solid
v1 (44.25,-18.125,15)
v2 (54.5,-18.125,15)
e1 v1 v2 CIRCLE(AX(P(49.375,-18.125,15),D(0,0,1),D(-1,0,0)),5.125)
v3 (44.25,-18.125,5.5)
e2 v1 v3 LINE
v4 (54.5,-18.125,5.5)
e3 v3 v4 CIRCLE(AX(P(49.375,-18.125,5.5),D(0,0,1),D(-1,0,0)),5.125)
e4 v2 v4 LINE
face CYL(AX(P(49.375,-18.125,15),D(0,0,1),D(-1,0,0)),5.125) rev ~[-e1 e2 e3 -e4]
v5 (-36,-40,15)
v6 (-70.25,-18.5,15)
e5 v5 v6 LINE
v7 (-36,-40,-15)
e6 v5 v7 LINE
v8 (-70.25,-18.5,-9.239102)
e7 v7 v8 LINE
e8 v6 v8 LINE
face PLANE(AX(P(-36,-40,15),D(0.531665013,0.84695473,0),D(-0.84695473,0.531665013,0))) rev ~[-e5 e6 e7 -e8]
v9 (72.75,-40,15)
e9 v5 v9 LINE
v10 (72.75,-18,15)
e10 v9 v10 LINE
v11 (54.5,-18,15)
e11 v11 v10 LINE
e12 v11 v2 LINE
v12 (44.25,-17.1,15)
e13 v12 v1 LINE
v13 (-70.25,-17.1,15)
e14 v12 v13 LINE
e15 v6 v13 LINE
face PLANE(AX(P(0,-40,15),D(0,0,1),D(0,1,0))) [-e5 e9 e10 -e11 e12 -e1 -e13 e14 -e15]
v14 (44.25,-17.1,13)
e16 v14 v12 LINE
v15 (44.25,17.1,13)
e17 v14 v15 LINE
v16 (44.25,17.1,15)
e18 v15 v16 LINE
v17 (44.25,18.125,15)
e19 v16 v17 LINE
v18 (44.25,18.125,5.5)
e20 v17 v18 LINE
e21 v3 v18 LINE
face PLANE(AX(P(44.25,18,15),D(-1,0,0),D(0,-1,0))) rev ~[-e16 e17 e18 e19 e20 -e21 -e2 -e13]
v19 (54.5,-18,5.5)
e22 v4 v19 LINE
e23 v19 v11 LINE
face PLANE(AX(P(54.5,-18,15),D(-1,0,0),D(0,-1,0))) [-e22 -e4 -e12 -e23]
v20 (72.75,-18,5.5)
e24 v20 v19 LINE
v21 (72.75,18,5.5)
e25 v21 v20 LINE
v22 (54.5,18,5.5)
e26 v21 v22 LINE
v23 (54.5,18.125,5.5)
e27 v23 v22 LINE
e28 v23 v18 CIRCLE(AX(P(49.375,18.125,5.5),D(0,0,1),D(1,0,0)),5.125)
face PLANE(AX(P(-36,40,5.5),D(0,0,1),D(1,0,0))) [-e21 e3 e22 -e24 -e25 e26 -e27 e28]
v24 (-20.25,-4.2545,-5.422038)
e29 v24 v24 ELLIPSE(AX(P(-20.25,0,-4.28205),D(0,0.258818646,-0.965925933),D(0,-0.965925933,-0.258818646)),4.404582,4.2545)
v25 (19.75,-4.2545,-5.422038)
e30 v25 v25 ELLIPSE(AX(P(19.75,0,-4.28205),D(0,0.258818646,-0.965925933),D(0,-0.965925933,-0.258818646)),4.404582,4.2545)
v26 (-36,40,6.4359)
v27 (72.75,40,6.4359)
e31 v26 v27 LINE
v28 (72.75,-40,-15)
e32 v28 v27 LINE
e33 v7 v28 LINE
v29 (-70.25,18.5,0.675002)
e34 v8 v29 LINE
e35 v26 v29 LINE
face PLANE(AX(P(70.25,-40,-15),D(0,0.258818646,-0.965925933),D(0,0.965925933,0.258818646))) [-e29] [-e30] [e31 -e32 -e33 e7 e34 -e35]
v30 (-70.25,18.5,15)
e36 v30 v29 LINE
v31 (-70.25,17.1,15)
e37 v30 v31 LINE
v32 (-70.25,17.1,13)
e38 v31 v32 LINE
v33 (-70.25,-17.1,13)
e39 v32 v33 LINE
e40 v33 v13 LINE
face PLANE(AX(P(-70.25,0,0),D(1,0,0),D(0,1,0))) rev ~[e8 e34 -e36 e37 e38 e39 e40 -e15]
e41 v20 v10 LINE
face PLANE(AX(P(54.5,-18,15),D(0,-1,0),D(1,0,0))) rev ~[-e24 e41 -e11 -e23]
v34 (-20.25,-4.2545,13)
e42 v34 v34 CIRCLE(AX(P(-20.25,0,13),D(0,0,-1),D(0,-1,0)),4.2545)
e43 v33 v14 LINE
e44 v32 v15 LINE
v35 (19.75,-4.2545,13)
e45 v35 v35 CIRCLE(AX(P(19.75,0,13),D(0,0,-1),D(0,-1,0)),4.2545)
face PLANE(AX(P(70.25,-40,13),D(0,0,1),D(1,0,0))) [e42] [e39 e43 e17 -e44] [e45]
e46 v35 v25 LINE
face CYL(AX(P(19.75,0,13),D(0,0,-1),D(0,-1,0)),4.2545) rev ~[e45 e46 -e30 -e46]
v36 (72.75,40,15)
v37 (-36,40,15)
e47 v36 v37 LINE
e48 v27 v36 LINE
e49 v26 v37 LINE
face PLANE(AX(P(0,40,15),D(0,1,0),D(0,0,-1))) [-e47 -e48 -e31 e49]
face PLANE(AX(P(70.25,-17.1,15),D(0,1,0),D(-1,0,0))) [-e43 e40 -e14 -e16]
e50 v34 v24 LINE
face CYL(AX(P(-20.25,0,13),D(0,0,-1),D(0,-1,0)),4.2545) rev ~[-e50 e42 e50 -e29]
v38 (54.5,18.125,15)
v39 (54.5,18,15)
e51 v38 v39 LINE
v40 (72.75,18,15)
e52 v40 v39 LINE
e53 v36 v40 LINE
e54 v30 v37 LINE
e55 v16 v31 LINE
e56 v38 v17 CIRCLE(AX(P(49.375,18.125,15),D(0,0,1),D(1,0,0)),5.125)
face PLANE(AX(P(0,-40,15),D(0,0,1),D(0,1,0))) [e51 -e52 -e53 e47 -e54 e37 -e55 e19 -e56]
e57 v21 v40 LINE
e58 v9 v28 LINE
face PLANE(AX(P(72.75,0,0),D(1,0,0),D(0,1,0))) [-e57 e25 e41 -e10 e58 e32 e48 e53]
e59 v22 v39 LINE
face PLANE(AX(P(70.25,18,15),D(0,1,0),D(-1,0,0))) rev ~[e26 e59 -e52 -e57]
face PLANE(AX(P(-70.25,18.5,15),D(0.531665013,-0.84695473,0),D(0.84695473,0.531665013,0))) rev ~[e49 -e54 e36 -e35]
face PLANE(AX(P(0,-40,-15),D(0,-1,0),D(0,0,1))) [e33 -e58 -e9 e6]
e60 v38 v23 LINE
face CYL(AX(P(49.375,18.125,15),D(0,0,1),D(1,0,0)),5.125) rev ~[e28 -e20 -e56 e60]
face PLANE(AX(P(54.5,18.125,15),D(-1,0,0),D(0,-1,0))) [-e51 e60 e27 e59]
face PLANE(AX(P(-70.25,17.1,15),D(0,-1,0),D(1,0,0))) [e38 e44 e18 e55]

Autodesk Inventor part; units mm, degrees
ref_plane "Right" through (0, 0, 0) normal (1, 0, 0) x (0, 1, 0)
ref_plane "Top" through (0, 0, 0) normal (0, 1, 0) x (-1, 0, 0)
ref_plane "Front" through (0, 0, 0) normal (0, 0, 1) x (1, 0, 0)
sketch "Sketch1" plane through (0, 0, 0) normal (1, 0, 0) x (0, 1, 0)
  line L0 (-40, 15) -> (40, 15)
  line L1 (40, 15) -> (40, -15)
  line L2 (40, -15) -> (-40, -15)
  line L3 (-40, -15) -> (-40, 15)
  line L4 (-40, 15) -> (40, -15) construction
  line L5 (40, 15) -> (-40, -15) construction
  point P0 (0, 0)
  dimension "d0" = 30
  dimension "d1" = 80
extrude "Extrusion1" add sketch "Sketch1" along normal mid plane 140.5
sketch "Sketch2" plane through (-70.25, -40, 15) normal (0, 0, 1) x (1, 0, 0)
  line L0 (140.5, 80) -> (0, 80) construction
  line L1 (0, 0) -> (0, 80) construction
  line L2 (0, 80) -> (0, 58.5)
  line L3 (0, 58.5) -> (34.25, 80)
  line L4 (34.25, 80) -> (0, 80)
  line L5 (0, 21.5) -> (0, 0)
  line L6 (0, 0) -> (34.25, 0)
  line L7 (34.25, 0) -> (0, 21.5)
  line L8 (140.5, 80) -> (140.5, 0) construction
  point P0 (70.25, 40)
  dimension "d4" = 37
  dimension "d6" = 147.882
  dimension "d38" = 106.25
extrude "Extrusion2" cut sketch "Sketch2" against normal through all
sketch "Sketch3" plane through (70.25, -40, 15) normal (0, 0, 1) x (1, 0, 0)
  line L0 (0, 80) -> (0, 0) construction
  line L1 (-140.5, 21.5) -> (-140.5, 58.5) construction
  line L2 (-140.5, 57.1) -> (0, 57.1)
  line L3 (0, 57.1) -> (0, 22.9)
  line L4 (0, 22.9) -> (-140.5, 22.9)
  line L5 (-140.5, 22.9) -> (-140.5, 57.1)
  point P0 (-70.25, 40)
  point P1 (-140.5, 40)
  dimension "d9" = 34.2
extrude "Extrusion3" cut sketch "Sketch3" against normal blind 2
sketch "Sketch4" plane through (-36, 40, 15) normal (0, 0, 1) x (1, 0, 0)
  line L0 (106.25, -57.1) -> (-34.25, -57.1) construction
  line L1 (-34.25, -58.5) -> (-34.25, -57.1) construction
  line L2 (-34.25, -58.5) -> (0, -80) construction
  line L3 (0, -80) -> (106.25, -80) construction
  line L4 (106.25, -57.1) -> (106.25, -80) construction
  line L5 (-34.25, -22.9) -> (106.25, -22.9) construction
  line L6 (-34.25, -57.1) -> (-34.25, -22.9) construction
  line L7 (106.25, -57.1) -> (-34.25, -57.1) construction
  line L8 (106.25, -22.9) -> (106.25, -57.1) construction
  line L9 (106.25, -22) -> (80.25, -22)
  line L10 (80.25, -22) -> (80.25, -58)
  line L11 (80.25, -58) -> (106.25, -58)
  line L12 (106.25, -58) -> (106.25, -22)
  line L13 (85.375, -21.875) -> (85.375, -58.125) construction
  line L14 (90.5, -21.875) -> (90.5, -58.125)
  line L15 (80.25, -58.125) -> (80.25, -21.875)
  arc A0 (90.5, -21.875) -> (80.25, -21.875) centre (85.375, -21.875) ccw
  arc A1 (80.25, -58.125) -> (90.5, -58.125) centre (85.375, -58.125) ccw
  point P0 (36, -40)
  point P1 (106.25, -40)
  point P2 (85.375, -40)
  point P3 (80.25, -40)
  dimension "d12" = 36
  dimension "d13" = 26
  dimension "d14" = 46.5
  dimension "d15" = 15.75
extrude "Extrusion4" cut sketch "Sketch4" against normal blind 9.5
sketch "Sketch5" plane through (70.25, -40, 13) normal (0, 0, 1) x (1, 0, 0)
  line L0 (-26, 22.9) -> (-26, 57.1) construction
  line L1 (-15.75, 58) -> (0, 58) construction
  line L2 (-15.75, 58.125) -> (-15.75, 58) construction
  arc A0 (-15.75, 58.125) -> (-26, 58.125) centre (-20.875, 58.125) ccw construction
  line L3 (-26, 21.875) -> (-26, 58.125) construction
  arc A1 (-26, 21.875) -> (-15.75, 21.875) centre (-20.875, 21.875) ccw construction
  line L4 (-15.75, 22) -> (-15.75, 21.875) construction
  line L5 (0, 22) -> (-15.75, 22) construction
  line L6 (0, 58) -> (0, 22) construction
  line L7 (-90.5, 40) -> (-50.5, 40)
  circle A2 centre (-90.5, 40) radius 4.25
  circle A3 centre (-50.5, 40) radius 4.25
  point P0 (-70.25, 40)
  dimension "d18" = 8.5
  dimension "d19" = 48.5
  dimension "d20" = 20.25
  dimension "d23" = 50.5
  dimension "d24" = 40
hole "Hole1" at (-20.25, 0, 13) at (19.75, 0, 13) direction (0, 0, -1) diameter 8.509 end through all
sketch "Sketch6" plane through (70.25, 0, 0) normal (1, 0, 0) x (0, 0, -1)
  line L0 (15, -40) -> (15, 40) construction
  line L1 (15, 40) -> (-15, 40) construction
  line L2 (15, -40) -> (-6.4359, 40)
  line L3 (-6.4359, 40) -> (15, 40)
  line L4 (15, 40) -> (15, -40)
  point P0 (0, 0)
  dimension "d32" = 15
extrude "Extrusion5" cut sketch "Sketch6" against normal through all
move faces "Move1" translate (2.5, 0, 0) faces at (70.25, -13.3333, -1.3333)
equation "\"BendRadius\" = Thickness"
equation "\"BendReliefWidth\" = 0.5 * Thickness"
equation "\"BendReliefDepth\" = 0.5 * Thickness"
equation "\"CornerReliefSize\" = 4 * Thickness"
equation "\"MinimumRemnant\" = 2 * Thickness"
equation "\"TransitionRadius\" = BendRadius"
equation "\"JacobiRadiusSize\" = BendRadius"
equation "\"Thickness\" = 6.35"
properties part number "DHC-1500-FF-02-003-CAST" material "A36"
